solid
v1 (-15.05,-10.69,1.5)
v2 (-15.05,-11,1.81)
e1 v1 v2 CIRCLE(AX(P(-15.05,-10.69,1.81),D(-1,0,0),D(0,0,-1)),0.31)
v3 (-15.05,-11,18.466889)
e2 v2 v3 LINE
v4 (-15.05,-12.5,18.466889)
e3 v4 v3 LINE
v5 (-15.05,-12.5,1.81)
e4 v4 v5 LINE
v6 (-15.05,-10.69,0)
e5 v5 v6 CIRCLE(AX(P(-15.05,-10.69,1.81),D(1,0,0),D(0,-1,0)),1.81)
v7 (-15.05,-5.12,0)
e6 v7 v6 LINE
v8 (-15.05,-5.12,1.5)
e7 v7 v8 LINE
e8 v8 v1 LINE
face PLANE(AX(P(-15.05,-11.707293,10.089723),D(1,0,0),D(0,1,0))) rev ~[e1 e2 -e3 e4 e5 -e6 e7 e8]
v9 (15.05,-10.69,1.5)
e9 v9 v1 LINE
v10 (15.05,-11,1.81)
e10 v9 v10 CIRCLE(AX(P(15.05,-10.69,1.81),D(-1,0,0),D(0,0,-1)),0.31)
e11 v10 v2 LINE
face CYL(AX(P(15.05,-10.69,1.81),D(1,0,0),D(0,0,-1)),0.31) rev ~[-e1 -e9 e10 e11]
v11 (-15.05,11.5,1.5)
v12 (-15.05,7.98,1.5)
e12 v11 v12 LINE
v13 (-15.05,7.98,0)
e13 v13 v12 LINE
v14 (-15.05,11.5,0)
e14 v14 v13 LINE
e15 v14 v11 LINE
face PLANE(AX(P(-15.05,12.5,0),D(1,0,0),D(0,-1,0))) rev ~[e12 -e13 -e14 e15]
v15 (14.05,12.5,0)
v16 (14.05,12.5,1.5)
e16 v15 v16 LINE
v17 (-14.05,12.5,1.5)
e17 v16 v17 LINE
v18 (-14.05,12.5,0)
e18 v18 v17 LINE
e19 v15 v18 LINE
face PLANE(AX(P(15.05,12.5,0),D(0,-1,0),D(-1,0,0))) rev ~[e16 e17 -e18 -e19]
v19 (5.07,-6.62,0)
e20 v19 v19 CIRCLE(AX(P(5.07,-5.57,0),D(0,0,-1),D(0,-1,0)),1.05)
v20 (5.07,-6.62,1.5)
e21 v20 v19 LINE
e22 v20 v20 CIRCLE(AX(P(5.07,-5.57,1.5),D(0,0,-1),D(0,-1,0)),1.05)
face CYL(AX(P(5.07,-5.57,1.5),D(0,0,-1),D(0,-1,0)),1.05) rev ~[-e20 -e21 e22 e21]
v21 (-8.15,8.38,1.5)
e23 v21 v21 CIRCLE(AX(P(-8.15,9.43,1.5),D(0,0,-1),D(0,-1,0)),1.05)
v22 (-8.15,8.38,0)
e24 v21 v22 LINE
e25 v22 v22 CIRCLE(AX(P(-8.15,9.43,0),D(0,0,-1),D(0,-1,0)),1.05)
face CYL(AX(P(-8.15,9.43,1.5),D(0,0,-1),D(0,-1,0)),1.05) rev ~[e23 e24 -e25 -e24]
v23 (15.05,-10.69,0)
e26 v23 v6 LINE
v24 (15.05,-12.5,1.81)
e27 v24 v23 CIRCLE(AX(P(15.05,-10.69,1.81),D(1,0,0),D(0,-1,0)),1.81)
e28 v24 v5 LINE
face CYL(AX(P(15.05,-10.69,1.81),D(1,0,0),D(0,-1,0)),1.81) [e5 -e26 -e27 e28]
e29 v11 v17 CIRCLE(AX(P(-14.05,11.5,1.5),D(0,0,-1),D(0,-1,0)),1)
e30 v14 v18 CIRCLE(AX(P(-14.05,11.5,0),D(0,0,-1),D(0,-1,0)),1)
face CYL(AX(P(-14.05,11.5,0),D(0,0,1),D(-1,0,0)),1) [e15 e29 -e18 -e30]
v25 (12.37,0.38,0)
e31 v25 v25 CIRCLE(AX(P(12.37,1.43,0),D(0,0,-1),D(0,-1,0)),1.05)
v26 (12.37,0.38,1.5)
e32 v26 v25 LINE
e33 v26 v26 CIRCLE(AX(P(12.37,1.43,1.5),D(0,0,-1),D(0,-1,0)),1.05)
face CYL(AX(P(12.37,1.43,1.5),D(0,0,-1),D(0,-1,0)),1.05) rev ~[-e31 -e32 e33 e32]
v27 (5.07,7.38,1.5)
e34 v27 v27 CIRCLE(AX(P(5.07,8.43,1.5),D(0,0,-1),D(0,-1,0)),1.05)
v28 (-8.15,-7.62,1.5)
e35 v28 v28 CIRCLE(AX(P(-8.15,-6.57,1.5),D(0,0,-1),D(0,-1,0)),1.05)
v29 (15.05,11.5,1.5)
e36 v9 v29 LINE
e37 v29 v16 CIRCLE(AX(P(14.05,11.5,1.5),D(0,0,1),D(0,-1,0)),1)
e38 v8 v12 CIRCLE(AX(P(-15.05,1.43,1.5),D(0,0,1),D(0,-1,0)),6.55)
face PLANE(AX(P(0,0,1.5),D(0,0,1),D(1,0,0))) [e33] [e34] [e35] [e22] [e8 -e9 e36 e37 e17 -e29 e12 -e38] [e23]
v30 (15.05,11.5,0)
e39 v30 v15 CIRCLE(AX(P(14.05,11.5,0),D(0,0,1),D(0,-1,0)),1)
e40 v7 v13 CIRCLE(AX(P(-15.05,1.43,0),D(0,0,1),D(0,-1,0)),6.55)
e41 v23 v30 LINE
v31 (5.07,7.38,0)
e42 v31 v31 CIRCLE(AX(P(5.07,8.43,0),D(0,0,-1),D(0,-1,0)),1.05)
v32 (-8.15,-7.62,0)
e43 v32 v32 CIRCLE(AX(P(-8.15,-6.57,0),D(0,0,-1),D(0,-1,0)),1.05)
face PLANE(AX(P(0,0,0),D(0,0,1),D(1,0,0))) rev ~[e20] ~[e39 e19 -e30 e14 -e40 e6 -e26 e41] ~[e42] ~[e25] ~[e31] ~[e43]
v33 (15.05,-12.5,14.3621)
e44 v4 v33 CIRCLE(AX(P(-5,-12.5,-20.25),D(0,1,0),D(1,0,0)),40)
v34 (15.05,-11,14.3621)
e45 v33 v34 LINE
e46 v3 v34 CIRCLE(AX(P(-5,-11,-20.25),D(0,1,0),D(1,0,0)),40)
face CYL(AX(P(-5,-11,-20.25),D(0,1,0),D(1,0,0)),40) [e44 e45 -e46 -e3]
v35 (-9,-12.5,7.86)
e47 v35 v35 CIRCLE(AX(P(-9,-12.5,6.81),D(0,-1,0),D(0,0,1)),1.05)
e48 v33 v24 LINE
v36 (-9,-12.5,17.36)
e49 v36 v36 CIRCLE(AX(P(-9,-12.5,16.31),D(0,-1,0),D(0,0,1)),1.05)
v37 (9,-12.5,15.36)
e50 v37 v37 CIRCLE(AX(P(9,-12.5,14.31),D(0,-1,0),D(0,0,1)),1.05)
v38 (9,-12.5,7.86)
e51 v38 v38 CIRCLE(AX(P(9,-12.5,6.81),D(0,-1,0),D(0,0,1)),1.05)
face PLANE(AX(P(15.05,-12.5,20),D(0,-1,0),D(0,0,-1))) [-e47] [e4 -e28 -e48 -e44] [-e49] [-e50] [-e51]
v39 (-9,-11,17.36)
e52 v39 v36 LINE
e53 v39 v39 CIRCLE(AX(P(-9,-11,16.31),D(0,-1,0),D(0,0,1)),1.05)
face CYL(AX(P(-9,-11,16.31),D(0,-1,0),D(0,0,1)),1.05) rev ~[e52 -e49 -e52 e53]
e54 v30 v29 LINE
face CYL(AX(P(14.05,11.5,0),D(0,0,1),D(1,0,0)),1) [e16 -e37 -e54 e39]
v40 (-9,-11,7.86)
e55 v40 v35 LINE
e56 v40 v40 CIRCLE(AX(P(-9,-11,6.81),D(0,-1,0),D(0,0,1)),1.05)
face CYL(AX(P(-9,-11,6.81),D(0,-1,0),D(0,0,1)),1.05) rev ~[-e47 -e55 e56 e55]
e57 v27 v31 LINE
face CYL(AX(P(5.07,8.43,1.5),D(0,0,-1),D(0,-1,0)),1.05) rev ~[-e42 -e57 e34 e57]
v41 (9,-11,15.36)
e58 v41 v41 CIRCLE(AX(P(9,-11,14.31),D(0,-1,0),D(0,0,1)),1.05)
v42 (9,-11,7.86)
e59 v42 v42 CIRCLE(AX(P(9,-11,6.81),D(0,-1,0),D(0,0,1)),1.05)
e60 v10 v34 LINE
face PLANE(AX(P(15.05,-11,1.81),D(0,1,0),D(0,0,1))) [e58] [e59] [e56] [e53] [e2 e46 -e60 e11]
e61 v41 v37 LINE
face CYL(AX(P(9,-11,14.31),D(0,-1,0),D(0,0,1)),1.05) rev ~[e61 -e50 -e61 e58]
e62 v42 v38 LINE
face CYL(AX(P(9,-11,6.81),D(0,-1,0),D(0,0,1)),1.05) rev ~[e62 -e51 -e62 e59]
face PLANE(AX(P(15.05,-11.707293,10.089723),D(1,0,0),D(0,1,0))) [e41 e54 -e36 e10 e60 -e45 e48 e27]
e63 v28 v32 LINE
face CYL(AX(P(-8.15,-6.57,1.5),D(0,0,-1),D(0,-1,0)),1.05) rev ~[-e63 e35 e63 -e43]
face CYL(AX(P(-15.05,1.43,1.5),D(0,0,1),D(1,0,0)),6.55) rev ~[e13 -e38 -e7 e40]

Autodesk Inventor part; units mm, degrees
ref_plane "YZ Plane" through (0, 0, 0) normal (1, 0, 0) x (0, 1, 0)
ref_plane "XZ Plane" through (0, 0, 0) normal (0, 1, 0) x (-1, 0, 0)
ref_plane "XY Plane" through (0, 0, 0) normal (0, 0, 1) x (1, 0, 0)
sketch "Sketch1" plane through (0, 0, 0) normal (0, 0, 1) x (1, 0, 0)
  line L0 (-15.05, -12.5) -> (15.05, -12.5)
  line L1 (15.05, -12.5) -> (15.05, 12.5)
  line L2 (15.05, 12.5) -> (-15.05, 12.5)
  line L3 (-15.05, 12.5) -> (-15.05, -12.5)
  line L4 (-15.05, -12.5) -> (15.05, 12.5) construction
  line L5 (15.05, -12.5) -> (-15.05, 12.5) construction
  point P0 (0, 0)
  dimension "d0" = 30.1
  dimension "d1" = 25
extrude "Plate1" add sketch "Sketch1" along normal blind 1.5
sketch "Sketch6" plane through (0, 0, 1.5) normal (0, 0, 1) x (1, 0, 0)
  circle A0 centre (-8.15, 9.43) radius 0.7835 projected
  circle A1 centre (-8.15, -6.57) radius 0.7835 projected
  circle A2 centre (5.07, 8.43) radius 0.7835 projected
  circle A3 centre (5.07, -5.57) radius 0.7835 projected
  circle A4 centre (12.37, 1.43) radius 0.7835 projected
  point P0 (0, 0)
hole "Hole2" at (-8.15, 9.43, 1.5) at (5.07, 8.43, 1.5) at (12.37, 1.43, 1.5) at (5.07, -5.57, 1.5) at (-8.15, -6.57, 1.5) direction (0, 0, -1) diameter 2.1 end through all
sketch "Sketch7" plane through (0, 0, 1.5) normal (0, 0, 1) x (1, 0, 0)
  circle A0 centre (-15.05, 1.43) radius 6.4 projected
  circle A1 centre (-15.05, 1.43) radius 6.55
  point P0 (0, 0)
  dimension "d42" = 0.15
extrude "Cut1" cut sketch "Sketch7" against normal blind 1.5 contours A0 | A1
sketch "Sketch8" plane through (15.05, -11, 0) normal (0, -1, 0) x (1, 0, 0)
  line L0 (-30.1, 0) -> (0, 0)
  line L1 (0, 0) -> (0, 20)
  line L2 (0, 20) -> (-30.1, 20)
  line L3 (-30.1, 20) -> (-30.1, 0)
edge flange "Flange2" height 20 angle 90 thickness 1.5 bend radius 0.31 thickness toward (0, -1, 0) relief tear relief width 1.5 relief depth 0.75 edges at (0, -12.5, 1.5) wall of the first edge with corners at (-15.05, -11, 0) (15.05, -11, 0) (15.05, -11, 20) (-15.05, -11, 20)
bend "Bend2"
corner "Corner2"
sketch "Sketch9" plane through (-15.05, -11, 20) normal (0, 1, 0) x (1, 0, 0)
  circle A0 centre (10.05, 40.25) radius 40 projected
  circle A1 centre (10.05, 40.25) radius 50
  point P0 (15.05, 20)
  dimension "d39" = 10
extrude "Cut2" cut sketch "Sketch9" against normal blind 1.5
fillet "Corner Round1" radius 1 2 edges at (15.05, 12.5, 0.75) (-15.05, 12.5, 0.75)
sketch "Sketch10" plane through (-15.05, -11, 1.81) normal (0, 1, 0) x (1, 0, 0)
  line L0 (30.1, 0) -> (0, 0) projected
  arc A0 (0, -16.6569) -> (30.1, -12.5521) centre (10.05, 22.06) ccw projected
  line L1 (15.05, 0) -> (15.05, -17.6263) construction
  point P0 (15.05, 1.81)
  point P1 (6.05, -5)
  point P2 (24.05, -5)
  point P3 (24.05, -12.5)
  point P4 (6.05, -14.5)
  dimension "d44" = 18
  dimension "d45" = 9.5
  dimension "d46" = 7.5
  dimension "d47" = 5
hole "Hole3" at (-9, -11, 6.81) at (9, -11, 6.81) at (9, -11, 14.31) at (-9, -11, 16.31) direction (0, -1, 0) diameter 2.1 end through all
equation "\"d27\" = Thickness"
equation "\"d40\" = Thickness"
equation "\"d2\" = Thickness"
equation "\"d29\" = BendReliefWidth"
equation "\"d30\" = BendReliefDepth"
equation "\"d31\" = MinimumRemnant"
equation "\"d32\" = TransitionRadius"
equation "\"d35\" = BendRadius"
equation "\"d36\" = CornerReliefSize"
equation "\"d37\" = GapSize"
equation "\"d38\" = JacobiRadiusSize"
equation "\"BendReliefWidth\" = Thickness"
equation "\"BendReliefDepth\" = 0.5 * Thickness"
equation "\"CornerReliefSize\" = 4 * Thickness"
equation "\"MinimumRemnant\" = 2 * Thickness"
equation "\"TransitionRadius\" = BendRadius"
equation "\"JacobiRadiusSize\" = BendRadius"
equation "\"GapSize\" = Thickness"
equation "\"Thickness\" = 1.5"
equation "\"BendRadius\" = 0.31"
properties part number "axis_2_bottom_L_frame(top)" material "Aluminum 6061-AHC"
